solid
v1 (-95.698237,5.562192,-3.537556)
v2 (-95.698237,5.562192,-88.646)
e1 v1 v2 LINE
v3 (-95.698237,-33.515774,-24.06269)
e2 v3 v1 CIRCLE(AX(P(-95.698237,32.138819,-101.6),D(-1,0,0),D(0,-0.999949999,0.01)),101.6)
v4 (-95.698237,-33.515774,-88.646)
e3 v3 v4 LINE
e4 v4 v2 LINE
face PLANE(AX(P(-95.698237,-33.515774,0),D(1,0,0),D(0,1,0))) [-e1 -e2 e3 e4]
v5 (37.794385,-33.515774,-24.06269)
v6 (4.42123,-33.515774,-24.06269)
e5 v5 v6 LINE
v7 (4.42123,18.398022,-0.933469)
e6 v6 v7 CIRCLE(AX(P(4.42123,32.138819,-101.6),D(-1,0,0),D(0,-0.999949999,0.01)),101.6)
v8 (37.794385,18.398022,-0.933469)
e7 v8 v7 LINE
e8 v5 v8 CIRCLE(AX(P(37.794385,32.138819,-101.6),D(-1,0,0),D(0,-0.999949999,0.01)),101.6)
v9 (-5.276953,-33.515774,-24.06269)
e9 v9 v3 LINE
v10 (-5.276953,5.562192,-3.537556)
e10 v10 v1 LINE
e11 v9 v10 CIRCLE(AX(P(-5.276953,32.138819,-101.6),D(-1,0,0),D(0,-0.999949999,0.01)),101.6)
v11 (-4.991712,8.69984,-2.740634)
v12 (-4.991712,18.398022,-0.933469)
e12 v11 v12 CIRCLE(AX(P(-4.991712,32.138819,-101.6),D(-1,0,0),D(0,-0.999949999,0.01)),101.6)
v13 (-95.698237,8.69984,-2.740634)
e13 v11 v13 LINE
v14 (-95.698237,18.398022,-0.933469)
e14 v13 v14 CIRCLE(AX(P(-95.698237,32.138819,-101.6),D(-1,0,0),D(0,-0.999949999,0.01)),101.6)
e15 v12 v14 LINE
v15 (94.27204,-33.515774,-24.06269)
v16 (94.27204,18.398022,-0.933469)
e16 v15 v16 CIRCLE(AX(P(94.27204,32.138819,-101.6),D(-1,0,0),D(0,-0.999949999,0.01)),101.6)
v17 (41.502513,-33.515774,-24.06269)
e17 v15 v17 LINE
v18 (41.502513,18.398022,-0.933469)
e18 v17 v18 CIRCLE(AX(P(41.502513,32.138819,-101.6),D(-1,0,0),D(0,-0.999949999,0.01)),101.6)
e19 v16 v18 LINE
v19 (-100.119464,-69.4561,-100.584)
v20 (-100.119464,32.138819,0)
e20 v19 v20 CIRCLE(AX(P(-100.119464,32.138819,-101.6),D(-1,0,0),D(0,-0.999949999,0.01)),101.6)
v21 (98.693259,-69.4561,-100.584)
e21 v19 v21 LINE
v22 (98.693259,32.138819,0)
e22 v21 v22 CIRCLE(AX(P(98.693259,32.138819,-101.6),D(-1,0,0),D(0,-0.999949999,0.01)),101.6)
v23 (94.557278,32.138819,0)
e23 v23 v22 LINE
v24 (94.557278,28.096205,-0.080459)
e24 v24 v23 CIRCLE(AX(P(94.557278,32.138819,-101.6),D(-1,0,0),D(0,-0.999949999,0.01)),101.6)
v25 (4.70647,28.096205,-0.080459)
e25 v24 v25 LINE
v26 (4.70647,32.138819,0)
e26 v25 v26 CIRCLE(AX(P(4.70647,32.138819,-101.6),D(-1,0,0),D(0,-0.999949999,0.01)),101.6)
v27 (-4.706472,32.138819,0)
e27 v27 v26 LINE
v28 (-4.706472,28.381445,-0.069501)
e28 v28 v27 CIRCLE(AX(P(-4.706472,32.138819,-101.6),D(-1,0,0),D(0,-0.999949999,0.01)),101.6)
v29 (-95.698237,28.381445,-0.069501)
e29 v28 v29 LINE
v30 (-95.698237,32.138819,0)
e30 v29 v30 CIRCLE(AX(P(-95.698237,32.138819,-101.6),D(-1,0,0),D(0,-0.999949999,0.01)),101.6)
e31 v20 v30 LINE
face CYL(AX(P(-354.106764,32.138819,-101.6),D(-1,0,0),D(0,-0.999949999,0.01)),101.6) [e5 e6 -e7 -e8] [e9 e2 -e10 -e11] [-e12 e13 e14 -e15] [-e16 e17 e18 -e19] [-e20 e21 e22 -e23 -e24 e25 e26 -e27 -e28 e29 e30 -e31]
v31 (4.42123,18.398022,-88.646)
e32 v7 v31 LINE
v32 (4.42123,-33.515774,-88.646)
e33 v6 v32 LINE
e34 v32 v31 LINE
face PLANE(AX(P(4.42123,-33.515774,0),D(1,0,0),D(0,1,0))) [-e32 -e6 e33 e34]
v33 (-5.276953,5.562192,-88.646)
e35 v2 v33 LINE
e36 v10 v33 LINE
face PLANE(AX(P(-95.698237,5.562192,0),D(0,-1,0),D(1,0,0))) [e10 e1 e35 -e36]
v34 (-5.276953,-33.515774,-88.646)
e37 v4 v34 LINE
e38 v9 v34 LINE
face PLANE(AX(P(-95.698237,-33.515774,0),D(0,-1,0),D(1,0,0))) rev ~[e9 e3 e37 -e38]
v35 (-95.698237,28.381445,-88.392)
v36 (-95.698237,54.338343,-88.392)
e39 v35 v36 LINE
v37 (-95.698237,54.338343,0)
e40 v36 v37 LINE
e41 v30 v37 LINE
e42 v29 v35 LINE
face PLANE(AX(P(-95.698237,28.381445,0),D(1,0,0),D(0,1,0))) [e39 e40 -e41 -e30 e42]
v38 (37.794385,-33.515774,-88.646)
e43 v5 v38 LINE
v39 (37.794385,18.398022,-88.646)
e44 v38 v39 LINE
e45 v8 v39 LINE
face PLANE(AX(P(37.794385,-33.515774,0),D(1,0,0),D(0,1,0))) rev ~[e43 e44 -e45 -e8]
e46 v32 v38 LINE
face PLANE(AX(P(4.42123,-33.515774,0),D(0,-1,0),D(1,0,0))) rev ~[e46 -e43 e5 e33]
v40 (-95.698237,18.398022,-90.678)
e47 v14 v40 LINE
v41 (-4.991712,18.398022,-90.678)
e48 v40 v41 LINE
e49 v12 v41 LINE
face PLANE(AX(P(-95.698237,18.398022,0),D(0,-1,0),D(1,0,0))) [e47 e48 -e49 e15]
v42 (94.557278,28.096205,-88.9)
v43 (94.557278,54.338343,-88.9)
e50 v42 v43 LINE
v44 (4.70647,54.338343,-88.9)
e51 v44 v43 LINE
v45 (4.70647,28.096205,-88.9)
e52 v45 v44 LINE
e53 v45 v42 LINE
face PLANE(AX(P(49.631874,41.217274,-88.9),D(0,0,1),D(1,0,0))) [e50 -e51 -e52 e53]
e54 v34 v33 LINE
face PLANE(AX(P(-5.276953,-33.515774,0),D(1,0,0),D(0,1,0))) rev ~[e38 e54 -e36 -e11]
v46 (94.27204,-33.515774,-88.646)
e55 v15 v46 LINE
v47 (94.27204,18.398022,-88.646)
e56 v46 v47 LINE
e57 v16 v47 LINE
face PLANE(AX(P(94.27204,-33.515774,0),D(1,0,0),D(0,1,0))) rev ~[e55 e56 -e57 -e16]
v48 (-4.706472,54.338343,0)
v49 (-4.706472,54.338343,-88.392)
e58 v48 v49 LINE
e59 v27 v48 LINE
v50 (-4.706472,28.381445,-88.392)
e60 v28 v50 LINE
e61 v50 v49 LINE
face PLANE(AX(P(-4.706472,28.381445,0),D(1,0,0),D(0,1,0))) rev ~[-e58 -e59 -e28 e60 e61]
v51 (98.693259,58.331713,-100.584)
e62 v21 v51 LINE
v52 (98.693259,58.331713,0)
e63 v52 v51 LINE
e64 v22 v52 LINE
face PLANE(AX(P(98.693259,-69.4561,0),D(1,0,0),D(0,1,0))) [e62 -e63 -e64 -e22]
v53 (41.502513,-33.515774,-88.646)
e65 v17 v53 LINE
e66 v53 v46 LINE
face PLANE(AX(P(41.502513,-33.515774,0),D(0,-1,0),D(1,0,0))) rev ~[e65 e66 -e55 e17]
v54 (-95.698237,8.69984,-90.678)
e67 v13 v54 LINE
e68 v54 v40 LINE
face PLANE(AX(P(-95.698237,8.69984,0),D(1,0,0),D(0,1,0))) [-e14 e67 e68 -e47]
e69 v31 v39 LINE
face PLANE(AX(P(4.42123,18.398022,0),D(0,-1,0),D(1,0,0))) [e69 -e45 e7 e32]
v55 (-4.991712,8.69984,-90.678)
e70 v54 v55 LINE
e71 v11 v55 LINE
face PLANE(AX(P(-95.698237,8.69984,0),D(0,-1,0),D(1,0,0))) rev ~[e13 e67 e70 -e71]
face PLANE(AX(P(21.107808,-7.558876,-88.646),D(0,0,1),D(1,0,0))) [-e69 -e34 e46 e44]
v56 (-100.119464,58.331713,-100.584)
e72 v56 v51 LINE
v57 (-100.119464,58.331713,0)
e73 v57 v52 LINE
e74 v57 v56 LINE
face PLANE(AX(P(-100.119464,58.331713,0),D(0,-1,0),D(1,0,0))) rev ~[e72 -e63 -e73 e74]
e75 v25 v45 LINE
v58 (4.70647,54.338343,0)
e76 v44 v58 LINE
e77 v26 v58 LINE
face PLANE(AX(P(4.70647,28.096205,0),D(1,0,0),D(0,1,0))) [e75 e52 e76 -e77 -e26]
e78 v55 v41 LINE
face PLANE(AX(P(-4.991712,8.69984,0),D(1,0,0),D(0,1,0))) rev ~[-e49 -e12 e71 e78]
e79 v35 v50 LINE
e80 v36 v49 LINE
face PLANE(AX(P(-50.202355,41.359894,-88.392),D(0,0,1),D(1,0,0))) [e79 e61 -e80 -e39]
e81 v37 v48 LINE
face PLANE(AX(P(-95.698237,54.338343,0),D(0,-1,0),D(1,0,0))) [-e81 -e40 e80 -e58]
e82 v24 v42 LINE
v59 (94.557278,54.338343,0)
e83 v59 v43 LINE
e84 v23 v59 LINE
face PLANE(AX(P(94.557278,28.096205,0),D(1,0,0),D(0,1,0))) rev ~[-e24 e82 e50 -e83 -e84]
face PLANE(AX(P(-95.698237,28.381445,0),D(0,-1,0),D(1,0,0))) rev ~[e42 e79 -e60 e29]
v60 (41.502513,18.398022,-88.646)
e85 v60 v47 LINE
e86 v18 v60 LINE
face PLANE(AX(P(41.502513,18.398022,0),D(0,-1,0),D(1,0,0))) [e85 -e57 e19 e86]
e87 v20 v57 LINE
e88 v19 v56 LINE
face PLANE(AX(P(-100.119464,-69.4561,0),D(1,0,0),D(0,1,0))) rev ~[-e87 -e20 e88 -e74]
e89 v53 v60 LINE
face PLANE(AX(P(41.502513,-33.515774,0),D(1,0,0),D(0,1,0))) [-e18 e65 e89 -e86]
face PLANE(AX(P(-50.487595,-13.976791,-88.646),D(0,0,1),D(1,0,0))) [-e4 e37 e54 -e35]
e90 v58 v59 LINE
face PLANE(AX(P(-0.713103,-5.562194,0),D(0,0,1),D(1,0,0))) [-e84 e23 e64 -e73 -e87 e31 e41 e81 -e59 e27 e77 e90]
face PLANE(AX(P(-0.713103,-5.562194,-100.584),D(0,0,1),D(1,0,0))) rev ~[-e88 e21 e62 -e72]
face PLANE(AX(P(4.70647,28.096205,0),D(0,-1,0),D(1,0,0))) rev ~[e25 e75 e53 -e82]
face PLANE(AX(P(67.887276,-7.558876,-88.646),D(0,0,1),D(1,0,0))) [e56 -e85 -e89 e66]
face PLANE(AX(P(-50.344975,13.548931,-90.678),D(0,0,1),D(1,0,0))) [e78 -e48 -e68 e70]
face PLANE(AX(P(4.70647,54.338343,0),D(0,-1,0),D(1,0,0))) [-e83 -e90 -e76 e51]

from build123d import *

# Parameters (mm, degrees)
F0_W        = 198.8127231598
F0_H        = 127.7878135443
F1_DEPTH    = 100.584
F2_T1_DEPTH = 706.7873225248
F3_W        = 90.9917657264
F3_H        = 25.9568989277
F4_DEPTH    = 88.392
F5_W        = 89.8508075625
F5_H        = 26.2421388179
F6_DEPTH    = 88.646
F7_DEPTH    = 0.254
F8_DEPTH    = 0.254
F9_W        = 90.7065253705
F9_H        = 9.6981823444
F10_DEPTH   = 90.678
F11_W       = 90.4212845489
F11_H       = 39.0779660083
F11_W_2     = 33.3731551655
F11_H_2     = 51.9137959927
F11_W_3     = 52.7695268393
F12_DEPTH   = 88.646


# Not quite as in the source:
# - a fillet or chamfer that OpenCascade refuses, or shapes differently, is made with other operations: its cross-section is extruded or revolved along the edge and cut away or added


with BuildPart() as f1:
    # F0 (on Top) → F1 (new body)
    with BuildSketch(Plane.XY):
        with Locations((-0.7131025195, -5.5621936917)):
            Rectangle(F0_W, F0_H)
    extrude(amount=-F1_DEPTH)

    # F2: fillet of radius 101.6 on 1 edges, made by hand

    # F2_s2 → F2_t1 (cut)
    with BuildSketch(Plane.YZ.offset(-354.1067637819)):
        with BuildLine():
            ThreePointArc((-69.4561004639, -100.584), (-39.3431167706, -29.39963435), (32.1388194091, 0))
            Line((32.1388194091, 0), (-69.4561004639, 0))
            Line((-69.4561004639, 0), (-69.4561004639, -100.584))
        make_face()
    extrude(amount=F2_T1_DEPTH, mode=Mode.SUBTRACT)

    # F3 (on Top) → F4 (cut)
    with BuildSketch(Plane.XY):
        with Locations((-50.2023545559, 41.3598939776)):
            Rectangle(F3_W, F3_H)
    extrude(amount=-F4_DEPTH, mode=Mode.SUBTRACT)

    # F5 (on Top) → F6 (cut)
    with BuildSketch(Plane.XY):
        with Locations((49.631874077, 41.2172740325)):
            Rectangle(F5_W, F5_H)
    extrude(amount=-F6_DEPTH, mode=Mode.SUBTRACT)

    # F7 (cut): a face of the model
    f7_faces = [f1.faces().sort_by_distance(p)[0] for p in [
        (-50.2023545559, 41.3598939776, -88.392),
    ]]
    extrude(f7_faces, amount=F7_DEPTH, mode=Mode.SUBTRACT)

    # F8 (cut): a face of the model
    f8_faces = [f1.faces().sort_by_distance(p)[0] for p in [
        (49.631874077, 41.2172740325, -88.646),
    ]]
    extrude(f8_faces, amount=-F8_DEPTH, mode=Mode.SUBTRACT)

    # F9 (on Top) → F10 (cut)
    with BuildSketch(Plane.XY):
        with Locations((-50.3449747339, 13.5489311069)):
            Rectangle(F9_W, F9_H)
    extrude(amount=-F10_DEPTH, mode=Mode.SUBTRACT)

    # F11 (on Top) → F12 (cut)
    with BuildSketch(Plane.XY):
        with Locations((-50.4875951447, -13.9767907094)):
            Rectangle(F11_W, F11_H)
        with Locations((21.1078075226, -7.5588757172)):
            Rectangle(F11_W_2, F11_H_2)
        with Locations((67.8872764111, -7.5588757172)):
            Rectangle(F11_W_3, F11_H_2)
    extrude(amount=-F12_DEPTH, mode=Mode.SUBTRACT)


solid = f1.part
